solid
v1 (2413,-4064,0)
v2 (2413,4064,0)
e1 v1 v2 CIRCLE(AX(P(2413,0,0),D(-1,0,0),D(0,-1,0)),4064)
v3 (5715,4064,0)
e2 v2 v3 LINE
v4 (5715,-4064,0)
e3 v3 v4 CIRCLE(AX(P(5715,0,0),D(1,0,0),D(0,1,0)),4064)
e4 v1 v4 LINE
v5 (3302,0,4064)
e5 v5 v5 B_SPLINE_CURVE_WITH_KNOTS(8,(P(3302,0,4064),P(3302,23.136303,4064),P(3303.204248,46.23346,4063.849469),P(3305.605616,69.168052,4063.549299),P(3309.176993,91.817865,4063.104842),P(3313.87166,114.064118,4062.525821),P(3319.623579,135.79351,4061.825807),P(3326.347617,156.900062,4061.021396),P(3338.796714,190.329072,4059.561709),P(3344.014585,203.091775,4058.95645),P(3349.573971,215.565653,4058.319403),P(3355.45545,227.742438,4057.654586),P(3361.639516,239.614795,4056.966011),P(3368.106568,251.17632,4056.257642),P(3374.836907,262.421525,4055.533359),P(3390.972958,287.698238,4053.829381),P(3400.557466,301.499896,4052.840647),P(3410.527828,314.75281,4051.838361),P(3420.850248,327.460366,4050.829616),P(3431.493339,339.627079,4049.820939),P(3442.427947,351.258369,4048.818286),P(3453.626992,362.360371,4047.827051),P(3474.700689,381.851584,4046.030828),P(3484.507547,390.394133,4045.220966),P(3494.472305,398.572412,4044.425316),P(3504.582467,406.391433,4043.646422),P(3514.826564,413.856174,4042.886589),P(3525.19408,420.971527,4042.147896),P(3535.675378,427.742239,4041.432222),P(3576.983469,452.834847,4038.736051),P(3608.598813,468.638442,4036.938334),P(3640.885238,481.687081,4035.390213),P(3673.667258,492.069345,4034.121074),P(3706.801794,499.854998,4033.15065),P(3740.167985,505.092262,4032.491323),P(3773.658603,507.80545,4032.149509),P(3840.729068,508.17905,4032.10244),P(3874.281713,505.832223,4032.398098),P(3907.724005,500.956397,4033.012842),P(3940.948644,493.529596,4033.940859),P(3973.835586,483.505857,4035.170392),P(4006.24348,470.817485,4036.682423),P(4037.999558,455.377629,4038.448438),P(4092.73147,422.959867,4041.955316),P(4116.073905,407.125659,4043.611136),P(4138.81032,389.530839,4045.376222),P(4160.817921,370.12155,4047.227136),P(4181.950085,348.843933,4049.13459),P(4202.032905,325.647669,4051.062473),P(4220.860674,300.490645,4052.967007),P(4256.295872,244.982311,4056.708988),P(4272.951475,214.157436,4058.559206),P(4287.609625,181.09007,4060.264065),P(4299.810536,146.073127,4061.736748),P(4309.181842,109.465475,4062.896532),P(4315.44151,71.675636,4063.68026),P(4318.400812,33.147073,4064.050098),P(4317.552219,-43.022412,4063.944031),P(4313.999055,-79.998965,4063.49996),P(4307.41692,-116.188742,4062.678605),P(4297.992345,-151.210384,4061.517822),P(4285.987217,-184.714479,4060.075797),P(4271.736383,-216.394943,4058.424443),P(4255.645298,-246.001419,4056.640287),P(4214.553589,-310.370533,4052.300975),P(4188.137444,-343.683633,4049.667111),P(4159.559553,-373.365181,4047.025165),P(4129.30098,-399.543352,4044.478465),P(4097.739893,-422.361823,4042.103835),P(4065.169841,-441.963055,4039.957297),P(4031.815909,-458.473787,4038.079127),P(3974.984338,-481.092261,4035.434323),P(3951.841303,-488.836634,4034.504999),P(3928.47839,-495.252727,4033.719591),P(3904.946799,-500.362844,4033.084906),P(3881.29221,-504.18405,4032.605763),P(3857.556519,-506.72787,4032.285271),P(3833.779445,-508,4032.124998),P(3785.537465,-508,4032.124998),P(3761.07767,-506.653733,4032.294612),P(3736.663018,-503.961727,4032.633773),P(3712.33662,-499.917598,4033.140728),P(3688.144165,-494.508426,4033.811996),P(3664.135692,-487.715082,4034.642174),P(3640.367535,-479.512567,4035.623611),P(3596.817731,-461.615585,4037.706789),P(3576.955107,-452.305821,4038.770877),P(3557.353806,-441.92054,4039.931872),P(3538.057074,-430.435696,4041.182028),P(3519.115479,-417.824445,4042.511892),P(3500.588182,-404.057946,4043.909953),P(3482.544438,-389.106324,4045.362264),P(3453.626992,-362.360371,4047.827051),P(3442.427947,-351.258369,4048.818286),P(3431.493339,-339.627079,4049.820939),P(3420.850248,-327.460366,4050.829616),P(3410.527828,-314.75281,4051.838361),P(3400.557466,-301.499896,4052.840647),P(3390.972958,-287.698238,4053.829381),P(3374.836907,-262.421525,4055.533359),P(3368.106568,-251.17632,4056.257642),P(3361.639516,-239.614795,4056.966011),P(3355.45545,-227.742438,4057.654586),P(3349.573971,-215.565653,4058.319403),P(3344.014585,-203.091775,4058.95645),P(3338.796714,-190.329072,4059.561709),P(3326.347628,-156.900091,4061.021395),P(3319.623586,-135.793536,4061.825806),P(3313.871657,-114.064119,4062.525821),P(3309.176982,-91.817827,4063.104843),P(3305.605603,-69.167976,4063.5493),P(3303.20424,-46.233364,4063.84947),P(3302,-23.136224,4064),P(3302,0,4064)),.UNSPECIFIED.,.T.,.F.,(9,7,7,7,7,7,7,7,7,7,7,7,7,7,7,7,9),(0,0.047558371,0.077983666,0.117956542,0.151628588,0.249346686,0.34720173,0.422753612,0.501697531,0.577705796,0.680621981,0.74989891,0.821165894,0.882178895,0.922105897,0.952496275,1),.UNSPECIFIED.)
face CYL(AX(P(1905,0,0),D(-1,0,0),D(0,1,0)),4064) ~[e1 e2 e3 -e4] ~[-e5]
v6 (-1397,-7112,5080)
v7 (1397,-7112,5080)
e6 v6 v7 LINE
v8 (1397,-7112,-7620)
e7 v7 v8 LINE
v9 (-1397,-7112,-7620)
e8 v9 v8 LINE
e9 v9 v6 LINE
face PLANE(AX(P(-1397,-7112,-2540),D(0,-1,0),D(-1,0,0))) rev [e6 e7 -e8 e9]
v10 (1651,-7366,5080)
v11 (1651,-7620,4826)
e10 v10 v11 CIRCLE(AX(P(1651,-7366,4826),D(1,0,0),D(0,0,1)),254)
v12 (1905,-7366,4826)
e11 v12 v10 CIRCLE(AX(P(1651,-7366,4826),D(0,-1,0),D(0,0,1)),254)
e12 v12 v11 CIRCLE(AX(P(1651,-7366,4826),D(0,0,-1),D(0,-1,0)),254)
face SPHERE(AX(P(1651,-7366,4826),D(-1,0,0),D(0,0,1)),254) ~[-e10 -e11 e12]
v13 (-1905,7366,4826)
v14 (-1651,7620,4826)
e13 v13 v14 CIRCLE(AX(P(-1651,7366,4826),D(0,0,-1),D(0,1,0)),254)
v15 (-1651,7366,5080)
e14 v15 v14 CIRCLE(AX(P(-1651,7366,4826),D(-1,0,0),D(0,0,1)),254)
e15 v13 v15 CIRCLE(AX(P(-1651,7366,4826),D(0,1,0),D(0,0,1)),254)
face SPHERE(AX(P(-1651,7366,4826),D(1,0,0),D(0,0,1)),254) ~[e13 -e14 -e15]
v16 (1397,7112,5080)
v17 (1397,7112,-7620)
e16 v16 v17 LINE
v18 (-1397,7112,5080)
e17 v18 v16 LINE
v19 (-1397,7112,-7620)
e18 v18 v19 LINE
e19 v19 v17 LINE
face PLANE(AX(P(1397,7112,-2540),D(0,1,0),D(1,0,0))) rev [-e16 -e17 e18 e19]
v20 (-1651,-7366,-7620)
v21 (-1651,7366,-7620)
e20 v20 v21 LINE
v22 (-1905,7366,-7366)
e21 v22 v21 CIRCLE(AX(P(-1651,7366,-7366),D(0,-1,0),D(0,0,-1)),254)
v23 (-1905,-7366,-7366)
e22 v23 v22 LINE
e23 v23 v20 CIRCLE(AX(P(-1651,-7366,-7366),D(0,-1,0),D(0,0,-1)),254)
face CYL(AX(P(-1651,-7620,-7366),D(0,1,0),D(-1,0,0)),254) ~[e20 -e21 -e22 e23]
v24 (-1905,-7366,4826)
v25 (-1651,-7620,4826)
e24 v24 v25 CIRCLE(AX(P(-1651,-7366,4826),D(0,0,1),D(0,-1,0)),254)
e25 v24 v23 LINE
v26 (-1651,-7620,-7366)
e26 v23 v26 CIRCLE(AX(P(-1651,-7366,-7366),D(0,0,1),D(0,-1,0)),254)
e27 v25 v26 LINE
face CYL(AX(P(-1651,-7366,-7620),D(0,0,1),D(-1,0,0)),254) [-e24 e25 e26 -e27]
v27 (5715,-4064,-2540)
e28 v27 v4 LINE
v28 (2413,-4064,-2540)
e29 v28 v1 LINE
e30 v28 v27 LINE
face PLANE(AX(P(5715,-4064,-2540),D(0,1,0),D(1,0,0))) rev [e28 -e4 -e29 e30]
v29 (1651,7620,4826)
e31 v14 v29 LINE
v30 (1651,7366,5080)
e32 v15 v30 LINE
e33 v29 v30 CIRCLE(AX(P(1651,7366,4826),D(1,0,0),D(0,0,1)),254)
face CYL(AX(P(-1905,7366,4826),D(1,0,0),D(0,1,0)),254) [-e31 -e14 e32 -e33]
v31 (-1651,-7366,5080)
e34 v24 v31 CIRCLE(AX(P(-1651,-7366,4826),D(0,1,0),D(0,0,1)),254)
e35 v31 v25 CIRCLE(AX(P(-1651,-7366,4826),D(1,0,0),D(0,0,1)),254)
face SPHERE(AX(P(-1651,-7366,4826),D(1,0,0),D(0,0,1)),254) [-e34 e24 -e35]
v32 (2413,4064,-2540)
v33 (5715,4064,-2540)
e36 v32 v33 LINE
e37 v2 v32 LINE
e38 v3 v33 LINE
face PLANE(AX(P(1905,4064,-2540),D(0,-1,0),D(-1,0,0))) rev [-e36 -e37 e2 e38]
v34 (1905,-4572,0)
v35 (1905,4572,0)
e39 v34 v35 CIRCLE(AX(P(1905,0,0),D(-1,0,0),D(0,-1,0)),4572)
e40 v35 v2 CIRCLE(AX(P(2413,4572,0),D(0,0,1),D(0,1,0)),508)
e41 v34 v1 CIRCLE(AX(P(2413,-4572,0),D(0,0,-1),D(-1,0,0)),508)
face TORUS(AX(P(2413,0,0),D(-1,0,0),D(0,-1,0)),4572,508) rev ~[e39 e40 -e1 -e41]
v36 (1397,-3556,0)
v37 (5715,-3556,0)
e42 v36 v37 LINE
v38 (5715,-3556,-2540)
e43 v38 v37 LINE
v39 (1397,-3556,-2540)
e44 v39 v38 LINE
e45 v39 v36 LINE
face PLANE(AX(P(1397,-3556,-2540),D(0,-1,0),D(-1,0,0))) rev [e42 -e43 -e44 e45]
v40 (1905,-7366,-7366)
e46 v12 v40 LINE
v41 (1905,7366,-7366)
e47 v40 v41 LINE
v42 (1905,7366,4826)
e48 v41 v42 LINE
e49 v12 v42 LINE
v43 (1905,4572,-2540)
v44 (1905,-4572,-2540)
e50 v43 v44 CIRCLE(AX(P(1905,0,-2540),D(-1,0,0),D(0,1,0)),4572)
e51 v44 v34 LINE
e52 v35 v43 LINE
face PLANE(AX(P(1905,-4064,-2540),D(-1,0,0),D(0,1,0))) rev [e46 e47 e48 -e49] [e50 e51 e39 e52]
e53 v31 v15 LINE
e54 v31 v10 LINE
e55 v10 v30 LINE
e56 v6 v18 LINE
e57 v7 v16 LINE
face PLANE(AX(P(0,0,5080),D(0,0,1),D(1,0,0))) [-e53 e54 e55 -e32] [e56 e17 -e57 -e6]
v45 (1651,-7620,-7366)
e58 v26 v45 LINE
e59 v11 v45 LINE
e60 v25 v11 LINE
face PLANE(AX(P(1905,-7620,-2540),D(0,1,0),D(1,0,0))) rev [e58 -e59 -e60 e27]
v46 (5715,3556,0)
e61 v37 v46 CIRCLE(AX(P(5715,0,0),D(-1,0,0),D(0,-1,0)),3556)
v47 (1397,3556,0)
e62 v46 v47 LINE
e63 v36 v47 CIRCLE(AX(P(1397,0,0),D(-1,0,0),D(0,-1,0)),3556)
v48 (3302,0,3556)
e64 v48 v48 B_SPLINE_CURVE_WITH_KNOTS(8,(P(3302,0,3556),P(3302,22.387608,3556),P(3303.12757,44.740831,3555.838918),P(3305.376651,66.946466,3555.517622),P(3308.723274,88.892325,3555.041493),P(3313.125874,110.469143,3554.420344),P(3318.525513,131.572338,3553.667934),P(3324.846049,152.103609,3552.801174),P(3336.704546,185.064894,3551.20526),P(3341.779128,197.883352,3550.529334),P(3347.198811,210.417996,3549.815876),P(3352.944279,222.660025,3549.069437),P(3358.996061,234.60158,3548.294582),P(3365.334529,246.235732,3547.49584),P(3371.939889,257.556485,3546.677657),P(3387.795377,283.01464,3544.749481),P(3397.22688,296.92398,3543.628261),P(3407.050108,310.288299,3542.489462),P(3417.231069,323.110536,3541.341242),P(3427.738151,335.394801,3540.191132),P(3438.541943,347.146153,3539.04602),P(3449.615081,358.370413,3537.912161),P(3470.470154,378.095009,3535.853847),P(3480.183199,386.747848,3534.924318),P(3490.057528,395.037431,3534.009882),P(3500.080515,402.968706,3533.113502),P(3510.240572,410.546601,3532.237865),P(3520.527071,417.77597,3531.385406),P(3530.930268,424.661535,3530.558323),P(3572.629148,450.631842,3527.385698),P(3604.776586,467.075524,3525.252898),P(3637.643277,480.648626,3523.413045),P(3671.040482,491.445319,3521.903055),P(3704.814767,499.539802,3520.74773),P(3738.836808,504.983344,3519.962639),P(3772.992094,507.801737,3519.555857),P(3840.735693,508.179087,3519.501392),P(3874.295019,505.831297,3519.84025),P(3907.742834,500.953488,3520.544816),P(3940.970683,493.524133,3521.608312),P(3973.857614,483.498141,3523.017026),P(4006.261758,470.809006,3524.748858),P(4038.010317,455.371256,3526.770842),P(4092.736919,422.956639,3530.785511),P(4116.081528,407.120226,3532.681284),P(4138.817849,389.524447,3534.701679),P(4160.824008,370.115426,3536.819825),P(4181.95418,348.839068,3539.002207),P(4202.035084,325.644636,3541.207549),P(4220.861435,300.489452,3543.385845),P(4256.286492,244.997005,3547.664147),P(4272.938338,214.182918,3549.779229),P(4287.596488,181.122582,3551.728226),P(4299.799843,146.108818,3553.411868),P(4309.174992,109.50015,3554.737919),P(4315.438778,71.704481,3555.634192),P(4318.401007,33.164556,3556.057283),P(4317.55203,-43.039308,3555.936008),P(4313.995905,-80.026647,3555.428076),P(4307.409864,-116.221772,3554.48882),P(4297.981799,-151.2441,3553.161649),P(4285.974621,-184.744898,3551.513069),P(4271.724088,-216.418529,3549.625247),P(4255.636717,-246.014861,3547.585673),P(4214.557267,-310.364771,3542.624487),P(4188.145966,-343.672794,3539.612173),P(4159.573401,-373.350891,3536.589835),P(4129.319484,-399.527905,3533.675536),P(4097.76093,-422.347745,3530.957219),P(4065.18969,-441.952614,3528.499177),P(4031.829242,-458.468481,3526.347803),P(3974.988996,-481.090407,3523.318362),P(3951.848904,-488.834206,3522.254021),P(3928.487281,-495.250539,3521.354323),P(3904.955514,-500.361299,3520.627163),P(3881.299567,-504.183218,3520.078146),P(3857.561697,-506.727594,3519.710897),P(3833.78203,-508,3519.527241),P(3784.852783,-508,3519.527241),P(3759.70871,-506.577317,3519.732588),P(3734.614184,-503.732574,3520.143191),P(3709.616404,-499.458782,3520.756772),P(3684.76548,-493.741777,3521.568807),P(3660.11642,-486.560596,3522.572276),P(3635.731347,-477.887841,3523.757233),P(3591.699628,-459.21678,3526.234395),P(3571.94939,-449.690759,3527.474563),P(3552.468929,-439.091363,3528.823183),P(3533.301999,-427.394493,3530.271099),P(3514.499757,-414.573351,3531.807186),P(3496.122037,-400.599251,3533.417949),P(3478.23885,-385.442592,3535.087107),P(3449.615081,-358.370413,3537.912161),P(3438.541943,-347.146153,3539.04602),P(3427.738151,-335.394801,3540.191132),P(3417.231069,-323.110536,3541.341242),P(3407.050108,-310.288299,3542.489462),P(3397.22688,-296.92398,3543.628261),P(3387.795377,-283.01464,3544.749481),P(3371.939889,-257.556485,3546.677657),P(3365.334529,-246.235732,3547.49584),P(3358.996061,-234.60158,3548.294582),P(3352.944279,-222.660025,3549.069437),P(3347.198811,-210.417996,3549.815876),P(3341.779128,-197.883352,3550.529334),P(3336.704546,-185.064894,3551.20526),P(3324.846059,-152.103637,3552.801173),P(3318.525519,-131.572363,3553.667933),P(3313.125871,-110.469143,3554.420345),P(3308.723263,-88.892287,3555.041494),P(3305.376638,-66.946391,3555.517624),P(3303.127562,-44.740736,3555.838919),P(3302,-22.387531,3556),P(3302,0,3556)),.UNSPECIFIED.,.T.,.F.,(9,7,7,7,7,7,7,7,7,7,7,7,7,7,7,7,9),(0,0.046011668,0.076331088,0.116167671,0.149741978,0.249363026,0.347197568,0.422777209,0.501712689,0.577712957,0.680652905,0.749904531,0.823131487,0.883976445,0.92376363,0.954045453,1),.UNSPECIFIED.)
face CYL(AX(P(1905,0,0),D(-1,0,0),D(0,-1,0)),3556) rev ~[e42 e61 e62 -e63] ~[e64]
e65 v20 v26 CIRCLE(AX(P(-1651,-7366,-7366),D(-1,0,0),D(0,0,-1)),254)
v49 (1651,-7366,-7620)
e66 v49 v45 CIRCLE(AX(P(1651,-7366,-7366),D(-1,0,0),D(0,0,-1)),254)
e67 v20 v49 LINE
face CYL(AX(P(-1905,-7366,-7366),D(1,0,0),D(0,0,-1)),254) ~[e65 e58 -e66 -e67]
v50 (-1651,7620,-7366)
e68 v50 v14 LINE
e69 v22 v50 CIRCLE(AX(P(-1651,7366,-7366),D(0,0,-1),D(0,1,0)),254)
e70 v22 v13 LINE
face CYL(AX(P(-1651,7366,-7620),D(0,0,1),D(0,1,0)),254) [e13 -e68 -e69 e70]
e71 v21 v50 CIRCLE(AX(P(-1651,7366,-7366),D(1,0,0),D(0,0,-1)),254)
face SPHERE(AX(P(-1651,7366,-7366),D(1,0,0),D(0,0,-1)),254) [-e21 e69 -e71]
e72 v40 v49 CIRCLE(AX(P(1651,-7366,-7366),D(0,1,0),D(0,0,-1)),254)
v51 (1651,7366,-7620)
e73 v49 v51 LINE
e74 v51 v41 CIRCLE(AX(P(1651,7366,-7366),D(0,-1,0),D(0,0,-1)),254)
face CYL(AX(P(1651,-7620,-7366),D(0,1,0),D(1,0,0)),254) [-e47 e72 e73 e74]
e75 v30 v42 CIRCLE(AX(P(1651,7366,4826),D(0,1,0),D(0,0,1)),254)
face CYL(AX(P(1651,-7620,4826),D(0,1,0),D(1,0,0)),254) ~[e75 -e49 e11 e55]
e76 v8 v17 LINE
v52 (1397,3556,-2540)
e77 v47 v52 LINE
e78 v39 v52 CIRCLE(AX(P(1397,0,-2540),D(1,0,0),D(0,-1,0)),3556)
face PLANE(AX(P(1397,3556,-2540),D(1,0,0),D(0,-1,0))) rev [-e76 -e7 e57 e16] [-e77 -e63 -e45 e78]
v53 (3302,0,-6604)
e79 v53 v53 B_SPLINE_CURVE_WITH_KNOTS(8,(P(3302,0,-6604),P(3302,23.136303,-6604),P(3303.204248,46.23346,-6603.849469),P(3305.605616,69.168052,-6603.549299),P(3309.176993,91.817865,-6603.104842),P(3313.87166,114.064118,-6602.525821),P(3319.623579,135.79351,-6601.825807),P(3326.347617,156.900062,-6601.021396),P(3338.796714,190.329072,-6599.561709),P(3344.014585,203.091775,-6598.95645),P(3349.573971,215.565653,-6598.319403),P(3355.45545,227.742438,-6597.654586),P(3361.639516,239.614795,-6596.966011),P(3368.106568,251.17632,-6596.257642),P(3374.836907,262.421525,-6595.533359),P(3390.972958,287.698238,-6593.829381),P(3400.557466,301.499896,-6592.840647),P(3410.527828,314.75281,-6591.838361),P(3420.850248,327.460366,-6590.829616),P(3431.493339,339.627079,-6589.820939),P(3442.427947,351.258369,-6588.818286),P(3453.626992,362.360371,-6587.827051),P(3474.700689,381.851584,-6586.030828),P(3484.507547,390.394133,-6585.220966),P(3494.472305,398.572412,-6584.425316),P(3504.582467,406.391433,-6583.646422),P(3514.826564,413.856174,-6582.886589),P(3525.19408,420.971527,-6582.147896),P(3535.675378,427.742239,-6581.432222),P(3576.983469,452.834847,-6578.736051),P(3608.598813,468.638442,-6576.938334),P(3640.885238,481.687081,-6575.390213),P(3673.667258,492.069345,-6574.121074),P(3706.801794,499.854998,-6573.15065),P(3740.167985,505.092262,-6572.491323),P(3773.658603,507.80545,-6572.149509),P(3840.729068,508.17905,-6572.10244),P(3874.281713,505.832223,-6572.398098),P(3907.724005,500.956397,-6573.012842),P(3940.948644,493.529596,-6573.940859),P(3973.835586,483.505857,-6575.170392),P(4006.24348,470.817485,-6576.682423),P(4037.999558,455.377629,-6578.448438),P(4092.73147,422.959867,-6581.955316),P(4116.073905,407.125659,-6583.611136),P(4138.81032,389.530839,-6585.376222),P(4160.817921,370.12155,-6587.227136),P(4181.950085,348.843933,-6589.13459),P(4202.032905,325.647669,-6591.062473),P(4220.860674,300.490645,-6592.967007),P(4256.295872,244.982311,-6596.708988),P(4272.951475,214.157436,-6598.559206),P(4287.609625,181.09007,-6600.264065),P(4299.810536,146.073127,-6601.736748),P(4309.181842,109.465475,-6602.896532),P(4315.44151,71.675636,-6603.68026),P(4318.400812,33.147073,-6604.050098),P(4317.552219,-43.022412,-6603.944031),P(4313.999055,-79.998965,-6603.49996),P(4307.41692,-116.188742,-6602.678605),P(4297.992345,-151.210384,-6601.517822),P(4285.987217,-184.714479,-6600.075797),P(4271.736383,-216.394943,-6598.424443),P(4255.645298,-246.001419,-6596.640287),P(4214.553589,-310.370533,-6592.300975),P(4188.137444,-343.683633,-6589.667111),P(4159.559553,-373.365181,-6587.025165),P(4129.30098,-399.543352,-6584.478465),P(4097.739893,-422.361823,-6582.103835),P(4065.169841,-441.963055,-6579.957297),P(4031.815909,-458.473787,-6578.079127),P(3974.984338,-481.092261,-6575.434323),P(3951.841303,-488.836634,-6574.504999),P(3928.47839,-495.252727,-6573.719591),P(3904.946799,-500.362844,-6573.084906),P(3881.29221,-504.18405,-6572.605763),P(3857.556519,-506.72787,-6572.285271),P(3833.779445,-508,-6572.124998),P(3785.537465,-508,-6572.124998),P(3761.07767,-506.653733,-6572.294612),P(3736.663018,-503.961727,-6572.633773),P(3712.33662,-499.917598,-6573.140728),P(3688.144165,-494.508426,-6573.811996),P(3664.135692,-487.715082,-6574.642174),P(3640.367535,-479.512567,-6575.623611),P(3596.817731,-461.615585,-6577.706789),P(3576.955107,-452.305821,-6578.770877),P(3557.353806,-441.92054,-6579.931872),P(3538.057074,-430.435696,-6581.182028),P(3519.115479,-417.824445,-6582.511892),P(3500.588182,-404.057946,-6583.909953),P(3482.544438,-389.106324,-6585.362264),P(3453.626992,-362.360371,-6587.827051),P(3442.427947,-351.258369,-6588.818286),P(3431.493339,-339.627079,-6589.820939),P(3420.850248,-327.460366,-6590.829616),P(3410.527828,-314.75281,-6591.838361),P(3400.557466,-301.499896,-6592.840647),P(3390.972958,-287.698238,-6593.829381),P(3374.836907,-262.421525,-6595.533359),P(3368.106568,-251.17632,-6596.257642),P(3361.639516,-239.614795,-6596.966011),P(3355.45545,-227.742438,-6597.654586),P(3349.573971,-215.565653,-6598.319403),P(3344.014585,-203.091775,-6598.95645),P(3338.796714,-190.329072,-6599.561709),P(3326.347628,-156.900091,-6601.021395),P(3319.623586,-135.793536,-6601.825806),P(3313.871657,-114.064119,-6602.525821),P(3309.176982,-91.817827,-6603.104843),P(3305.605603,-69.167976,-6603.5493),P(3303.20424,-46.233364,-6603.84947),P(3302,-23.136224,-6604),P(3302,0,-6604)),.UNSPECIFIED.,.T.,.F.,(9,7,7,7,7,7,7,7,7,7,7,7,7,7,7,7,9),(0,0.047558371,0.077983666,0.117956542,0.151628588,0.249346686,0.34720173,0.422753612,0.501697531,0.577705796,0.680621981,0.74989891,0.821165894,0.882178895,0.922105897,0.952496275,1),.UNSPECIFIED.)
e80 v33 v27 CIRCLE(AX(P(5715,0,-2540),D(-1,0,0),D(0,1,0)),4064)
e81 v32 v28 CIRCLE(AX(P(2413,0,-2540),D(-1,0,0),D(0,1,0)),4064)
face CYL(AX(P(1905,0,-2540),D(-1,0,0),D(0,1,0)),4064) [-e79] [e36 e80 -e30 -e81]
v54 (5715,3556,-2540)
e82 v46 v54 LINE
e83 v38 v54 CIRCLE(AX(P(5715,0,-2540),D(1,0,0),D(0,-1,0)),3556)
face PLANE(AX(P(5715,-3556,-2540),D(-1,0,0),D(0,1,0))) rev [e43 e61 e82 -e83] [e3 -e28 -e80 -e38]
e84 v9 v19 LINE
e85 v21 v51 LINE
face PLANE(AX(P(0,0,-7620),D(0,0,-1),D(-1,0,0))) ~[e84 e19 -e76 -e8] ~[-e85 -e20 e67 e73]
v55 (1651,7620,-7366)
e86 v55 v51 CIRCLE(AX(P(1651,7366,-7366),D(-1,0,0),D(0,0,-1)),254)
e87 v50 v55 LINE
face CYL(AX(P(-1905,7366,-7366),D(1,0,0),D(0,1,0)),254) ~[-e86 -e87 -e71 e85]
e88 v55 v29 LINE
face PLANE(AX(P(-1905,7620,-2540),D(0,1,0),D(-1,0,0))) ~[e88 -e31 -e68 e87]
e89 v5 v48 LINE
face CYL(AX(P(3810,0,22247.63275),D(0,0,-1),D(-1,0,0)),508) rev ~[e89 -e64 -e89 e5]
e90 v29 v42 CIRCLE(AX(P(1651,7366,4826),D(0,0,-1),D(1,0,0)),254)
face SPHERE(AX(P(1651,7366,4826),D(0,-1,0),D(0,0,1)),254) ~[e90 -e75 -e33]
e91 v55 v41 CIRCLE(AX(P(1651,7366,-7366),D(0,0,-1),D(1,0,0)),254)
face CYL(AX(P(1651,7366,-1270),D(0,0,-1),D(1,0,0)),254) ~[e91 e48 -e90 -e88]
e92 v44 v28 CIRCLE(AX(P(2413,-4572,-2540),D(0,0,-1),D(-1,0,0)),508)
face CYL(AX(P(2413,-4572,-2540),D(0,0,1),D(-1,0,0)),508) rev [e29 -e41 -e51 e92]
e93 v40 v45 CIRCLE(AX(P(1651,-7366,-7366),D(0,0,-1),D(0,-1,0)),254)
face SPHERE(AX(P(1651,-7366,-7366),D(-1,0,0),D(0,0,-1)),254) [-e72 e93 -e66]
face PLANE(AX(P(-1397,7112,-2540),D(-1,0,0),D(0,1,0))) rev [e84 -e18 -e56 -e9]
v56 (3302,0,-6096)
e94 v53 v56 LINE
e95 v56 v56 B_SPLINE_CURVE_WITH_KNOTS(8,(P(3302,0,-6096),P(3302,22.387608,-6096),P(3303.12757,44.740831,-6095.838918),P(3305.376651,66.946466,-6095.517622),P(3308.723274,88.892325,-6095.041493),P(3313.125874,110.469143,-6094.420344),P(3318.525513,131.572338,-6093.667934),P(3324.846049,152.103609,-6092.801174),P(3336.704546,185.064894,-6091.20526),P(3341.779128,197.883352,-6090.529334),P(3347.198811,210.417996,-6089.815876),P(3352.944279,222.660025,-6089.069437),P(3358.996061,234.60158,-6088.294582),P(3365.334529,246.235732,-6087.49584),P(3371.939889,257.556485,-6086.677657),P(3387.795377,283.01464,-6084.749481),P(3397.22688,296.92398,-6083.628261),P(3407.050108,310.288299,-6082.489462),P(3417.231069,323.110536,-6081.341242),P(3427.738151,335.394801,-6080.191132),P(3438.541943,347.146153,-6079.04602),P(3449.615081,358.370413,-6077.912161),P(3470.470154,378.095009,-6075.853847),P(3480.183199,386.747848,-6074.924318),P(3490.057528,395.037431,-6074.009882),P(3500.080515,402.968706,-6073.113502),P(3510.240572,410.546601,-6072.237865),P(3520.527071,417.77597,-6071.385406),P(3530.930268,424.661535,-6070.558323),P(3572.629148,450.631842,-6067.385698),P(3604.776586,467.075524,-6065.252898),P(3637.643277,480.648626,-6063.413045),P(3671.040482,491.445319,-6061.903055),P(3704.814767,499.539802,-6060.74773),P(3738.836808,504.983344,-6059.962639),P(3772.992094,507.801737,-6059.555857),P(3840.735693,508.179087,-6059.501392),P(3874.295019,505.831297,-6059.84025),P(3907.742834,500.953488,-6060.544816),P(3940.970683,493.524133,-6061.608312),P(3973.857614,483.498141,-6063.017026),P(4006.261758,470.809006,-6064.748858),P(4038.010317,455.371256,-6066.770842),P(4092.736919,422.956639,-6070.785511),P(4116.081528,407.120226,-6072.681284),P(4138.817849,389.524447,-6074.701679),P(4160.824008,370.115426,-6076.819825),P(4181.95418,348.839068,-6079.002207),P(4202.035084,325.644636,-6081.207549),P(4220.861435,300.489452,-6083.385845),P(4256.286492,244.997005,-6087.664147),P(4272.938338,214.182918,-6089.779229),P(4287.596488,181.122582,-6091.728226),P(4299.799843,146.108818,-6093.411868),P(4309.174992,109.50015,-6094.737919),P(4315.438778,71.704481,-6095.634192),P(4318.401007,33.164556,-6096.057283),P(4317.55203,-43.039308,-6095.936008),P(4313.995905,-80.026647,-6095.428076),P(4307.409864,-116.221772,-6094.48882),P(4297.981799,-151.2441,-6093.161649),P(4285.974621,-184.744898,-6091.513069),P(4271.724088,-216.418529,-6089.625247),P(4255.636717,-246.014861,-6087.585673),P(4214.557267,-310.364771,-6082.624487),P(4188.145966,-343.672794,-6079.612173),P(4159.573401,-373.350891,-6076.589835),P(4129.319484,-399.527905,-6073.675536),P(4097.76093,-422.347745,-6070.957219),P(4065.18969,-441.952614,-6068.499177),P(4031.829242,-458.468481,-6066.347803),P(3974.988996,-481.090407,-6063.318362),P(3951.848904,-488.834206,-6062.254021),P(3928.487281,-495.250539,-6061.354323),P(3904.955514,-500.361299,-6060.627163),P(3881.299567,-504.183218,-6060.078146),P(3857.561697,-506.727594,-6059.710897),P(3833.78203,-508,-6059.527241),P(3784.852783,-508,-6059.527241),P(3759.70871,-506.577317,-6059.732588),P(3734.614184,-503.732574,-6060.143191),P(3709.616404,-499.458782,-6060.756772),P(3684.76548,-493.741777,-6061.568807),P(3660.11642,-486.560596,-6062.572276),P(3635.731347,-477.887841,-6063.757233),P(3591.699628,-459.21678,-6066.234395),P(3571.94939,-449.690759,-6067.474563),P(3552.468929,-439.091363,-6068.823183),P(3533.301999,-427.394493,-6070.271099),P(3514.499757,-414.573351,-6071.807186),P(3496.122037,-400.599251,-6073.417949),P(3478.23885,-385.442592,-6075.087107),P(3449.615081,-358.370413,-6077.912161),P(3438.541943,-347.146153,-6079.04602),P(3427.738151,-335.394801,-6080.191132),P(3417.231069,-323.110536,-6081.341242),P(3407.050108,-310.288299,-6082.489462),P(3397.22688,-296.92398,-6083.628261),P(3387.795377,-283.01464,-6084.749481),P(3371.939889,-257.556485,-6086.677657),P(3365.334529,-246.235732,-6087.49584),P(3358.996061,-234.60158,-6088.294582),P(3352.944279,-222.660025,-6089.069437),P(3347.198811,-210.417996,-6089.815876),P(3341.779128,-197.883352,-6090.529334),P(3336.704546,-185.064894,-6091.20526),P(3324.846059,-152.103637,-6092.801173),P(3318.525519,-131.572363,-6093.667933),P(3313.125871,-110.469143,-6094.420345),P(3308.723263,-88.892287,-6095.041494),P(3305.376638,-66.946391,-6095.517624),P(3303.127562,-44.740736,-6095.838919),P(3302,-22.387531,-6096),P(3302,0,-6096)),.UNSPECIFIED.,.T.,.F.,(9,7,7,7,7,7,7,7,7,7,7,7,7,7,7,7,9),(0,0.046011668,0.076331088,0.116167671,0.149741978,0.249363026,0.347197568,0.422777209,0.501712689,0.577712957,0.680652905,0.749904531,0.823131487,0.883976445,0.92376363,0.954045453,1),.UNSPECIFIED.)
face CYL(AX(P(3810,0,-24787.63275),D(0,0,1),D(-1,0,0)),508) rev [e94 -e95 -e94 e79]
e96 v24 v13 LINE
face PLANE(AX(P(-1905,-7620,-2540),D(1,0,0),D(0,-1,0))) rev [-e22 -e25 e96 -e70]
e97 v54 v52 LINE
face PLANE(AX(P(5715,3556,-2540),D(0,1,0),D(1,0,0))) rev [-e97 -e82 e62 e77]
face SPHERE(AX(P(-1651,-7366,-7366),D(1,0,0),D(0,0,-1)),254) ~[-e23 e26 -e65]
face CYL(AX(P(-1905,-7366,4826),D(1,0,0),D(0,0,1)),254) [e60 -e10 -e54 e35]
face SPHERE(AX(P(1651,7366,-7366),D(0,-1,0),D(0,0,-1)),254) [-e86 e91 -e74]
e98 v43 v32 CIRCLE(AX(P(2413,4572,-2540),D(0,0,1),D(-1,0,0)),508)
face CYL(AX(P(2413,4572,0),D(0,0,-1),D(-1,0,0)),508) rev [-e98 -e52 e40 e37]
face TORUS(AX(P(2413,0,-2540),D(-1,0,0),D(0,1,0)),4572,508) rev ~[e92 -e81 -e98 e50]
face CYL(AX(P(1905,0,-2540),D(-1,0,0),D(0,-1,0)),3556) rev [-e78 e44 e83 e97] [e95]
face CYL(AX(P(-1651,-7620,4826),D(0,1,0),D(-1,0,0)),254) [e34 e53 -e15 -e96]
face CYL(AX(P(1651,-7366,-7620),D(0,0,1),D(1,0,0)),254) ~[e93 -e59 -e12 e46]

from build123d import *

# Parameters (mm, degrees)
F3_W     = 3810
F3_H     = 15240
F3_W_2   = 2794
F3_H_2   = 14224
F4_DEPTH = 5080
F6_DEPTH = 3810
F7_DEPTH = 508
F9_DEPTH = 1270
F10_R    = 254
F14_D    = 1016
F16_R    = 508


# Not quite as in the source:
# - a variable given as a bare number and used for a length is read in inches; the dataset says mm whatever the document's units were


with BuildPart() as f4:
    # F3 (on Top) → F4 (new body)
    with BuildSketch(Plane.XY):
        Rectangle(F3_W, F3_H)
        Rectangle(F3_W_2, F3_H_2, mode=Mode.SUBTRACT)
    extrude(amount=F4_DEPTH)

    # F5 (on face) → F6 (join)
    with BuildSketch(Plane.YZ.offset(1905)):
        with BuildLine():
            Line((3556, 0), (4064, 0))
            ThreePointArc((4064, 0), (0, 4064), (-4064, 0))
            Line((-4064, 0), (-3556, 0))
            ThreePointArc((-3556, 0), (0, 3556), (3556, 0))
        make_face()
    extrude(amount=F6_DEPTH)

    # F7 (cut, through all): a face of the model
    f7_faces = [f4.faces().sort_by_distance(p)[0] for p in [
        (1905, 0, 1509.2132736927),
    ]]
    extrude(f7_faces, amount=-F7_DEPTH, mode=Mode.SUBTRACT)

    # F8 (on face) → F9 (join)
    with BuildSketch(Plane(origin=(0, 0, 0), x_dir=(1, 0, 0), z_dir=(0, 0, -1))):
        Polygon((1905, 4064), (1905, 7620), (-1905, 7620), (-1905, -7620), (1905, -7620), (1905, -4064), (5715, -4064), (5715, -3556), (1397, -3556), (1397, -7112), (-1397, -7112), (-1397, 7112), (1397, 7112), (1397, 3556), (5715, 3556), (5715, 4064), align=None)
    extrude(amount=F9_DEPTH)

    # F10
    f10_edges = [f4.edges().sort_by_distance(p)[0] for p in [
        (0, -7620, 5080),
        (1905, 0, 5080),
        (0, 7620, 5080),
        (-1905, 0, 5080),
        (1905, -7620, 1905),
        (1905, 7620, 1905),
        (-1905, -7620, 1905),
        (-1905, 7620, 1905),
    ]]
    fillet(f10_edges, radius=F10_R)

    # F14 (through all)
    with Locations(Plane.XY.offset(4064)):
        with Locations((3810, 0)):
            Hole(F14_D / 2)

    # F15: F4 across face


with BuildPart() as f4_1:
    add(f4.part)
    add(f4.part.mirror(Plane(origin=(474.1354212806, 0, -1270), x_dir=(1, 0, 0), z_dir=(0, 0, -1))))

    # F16
    f16_edges = [f4_1.edges().sort_by_distance(p)[0] for p in [
        (1905, -7366, -1270),
        (1905, 0, 4826),
        (1905, 7366, -1270),
        (1905, 0, -7366),
        (1905, -4064, -1270),
        (1905, 0, -6604),
        (1905, 4064, -1270),
        (1905, 0, 4064),
    ]]
    fillet(f16_edges, radius=F16_R)


solid = f4_1.part
